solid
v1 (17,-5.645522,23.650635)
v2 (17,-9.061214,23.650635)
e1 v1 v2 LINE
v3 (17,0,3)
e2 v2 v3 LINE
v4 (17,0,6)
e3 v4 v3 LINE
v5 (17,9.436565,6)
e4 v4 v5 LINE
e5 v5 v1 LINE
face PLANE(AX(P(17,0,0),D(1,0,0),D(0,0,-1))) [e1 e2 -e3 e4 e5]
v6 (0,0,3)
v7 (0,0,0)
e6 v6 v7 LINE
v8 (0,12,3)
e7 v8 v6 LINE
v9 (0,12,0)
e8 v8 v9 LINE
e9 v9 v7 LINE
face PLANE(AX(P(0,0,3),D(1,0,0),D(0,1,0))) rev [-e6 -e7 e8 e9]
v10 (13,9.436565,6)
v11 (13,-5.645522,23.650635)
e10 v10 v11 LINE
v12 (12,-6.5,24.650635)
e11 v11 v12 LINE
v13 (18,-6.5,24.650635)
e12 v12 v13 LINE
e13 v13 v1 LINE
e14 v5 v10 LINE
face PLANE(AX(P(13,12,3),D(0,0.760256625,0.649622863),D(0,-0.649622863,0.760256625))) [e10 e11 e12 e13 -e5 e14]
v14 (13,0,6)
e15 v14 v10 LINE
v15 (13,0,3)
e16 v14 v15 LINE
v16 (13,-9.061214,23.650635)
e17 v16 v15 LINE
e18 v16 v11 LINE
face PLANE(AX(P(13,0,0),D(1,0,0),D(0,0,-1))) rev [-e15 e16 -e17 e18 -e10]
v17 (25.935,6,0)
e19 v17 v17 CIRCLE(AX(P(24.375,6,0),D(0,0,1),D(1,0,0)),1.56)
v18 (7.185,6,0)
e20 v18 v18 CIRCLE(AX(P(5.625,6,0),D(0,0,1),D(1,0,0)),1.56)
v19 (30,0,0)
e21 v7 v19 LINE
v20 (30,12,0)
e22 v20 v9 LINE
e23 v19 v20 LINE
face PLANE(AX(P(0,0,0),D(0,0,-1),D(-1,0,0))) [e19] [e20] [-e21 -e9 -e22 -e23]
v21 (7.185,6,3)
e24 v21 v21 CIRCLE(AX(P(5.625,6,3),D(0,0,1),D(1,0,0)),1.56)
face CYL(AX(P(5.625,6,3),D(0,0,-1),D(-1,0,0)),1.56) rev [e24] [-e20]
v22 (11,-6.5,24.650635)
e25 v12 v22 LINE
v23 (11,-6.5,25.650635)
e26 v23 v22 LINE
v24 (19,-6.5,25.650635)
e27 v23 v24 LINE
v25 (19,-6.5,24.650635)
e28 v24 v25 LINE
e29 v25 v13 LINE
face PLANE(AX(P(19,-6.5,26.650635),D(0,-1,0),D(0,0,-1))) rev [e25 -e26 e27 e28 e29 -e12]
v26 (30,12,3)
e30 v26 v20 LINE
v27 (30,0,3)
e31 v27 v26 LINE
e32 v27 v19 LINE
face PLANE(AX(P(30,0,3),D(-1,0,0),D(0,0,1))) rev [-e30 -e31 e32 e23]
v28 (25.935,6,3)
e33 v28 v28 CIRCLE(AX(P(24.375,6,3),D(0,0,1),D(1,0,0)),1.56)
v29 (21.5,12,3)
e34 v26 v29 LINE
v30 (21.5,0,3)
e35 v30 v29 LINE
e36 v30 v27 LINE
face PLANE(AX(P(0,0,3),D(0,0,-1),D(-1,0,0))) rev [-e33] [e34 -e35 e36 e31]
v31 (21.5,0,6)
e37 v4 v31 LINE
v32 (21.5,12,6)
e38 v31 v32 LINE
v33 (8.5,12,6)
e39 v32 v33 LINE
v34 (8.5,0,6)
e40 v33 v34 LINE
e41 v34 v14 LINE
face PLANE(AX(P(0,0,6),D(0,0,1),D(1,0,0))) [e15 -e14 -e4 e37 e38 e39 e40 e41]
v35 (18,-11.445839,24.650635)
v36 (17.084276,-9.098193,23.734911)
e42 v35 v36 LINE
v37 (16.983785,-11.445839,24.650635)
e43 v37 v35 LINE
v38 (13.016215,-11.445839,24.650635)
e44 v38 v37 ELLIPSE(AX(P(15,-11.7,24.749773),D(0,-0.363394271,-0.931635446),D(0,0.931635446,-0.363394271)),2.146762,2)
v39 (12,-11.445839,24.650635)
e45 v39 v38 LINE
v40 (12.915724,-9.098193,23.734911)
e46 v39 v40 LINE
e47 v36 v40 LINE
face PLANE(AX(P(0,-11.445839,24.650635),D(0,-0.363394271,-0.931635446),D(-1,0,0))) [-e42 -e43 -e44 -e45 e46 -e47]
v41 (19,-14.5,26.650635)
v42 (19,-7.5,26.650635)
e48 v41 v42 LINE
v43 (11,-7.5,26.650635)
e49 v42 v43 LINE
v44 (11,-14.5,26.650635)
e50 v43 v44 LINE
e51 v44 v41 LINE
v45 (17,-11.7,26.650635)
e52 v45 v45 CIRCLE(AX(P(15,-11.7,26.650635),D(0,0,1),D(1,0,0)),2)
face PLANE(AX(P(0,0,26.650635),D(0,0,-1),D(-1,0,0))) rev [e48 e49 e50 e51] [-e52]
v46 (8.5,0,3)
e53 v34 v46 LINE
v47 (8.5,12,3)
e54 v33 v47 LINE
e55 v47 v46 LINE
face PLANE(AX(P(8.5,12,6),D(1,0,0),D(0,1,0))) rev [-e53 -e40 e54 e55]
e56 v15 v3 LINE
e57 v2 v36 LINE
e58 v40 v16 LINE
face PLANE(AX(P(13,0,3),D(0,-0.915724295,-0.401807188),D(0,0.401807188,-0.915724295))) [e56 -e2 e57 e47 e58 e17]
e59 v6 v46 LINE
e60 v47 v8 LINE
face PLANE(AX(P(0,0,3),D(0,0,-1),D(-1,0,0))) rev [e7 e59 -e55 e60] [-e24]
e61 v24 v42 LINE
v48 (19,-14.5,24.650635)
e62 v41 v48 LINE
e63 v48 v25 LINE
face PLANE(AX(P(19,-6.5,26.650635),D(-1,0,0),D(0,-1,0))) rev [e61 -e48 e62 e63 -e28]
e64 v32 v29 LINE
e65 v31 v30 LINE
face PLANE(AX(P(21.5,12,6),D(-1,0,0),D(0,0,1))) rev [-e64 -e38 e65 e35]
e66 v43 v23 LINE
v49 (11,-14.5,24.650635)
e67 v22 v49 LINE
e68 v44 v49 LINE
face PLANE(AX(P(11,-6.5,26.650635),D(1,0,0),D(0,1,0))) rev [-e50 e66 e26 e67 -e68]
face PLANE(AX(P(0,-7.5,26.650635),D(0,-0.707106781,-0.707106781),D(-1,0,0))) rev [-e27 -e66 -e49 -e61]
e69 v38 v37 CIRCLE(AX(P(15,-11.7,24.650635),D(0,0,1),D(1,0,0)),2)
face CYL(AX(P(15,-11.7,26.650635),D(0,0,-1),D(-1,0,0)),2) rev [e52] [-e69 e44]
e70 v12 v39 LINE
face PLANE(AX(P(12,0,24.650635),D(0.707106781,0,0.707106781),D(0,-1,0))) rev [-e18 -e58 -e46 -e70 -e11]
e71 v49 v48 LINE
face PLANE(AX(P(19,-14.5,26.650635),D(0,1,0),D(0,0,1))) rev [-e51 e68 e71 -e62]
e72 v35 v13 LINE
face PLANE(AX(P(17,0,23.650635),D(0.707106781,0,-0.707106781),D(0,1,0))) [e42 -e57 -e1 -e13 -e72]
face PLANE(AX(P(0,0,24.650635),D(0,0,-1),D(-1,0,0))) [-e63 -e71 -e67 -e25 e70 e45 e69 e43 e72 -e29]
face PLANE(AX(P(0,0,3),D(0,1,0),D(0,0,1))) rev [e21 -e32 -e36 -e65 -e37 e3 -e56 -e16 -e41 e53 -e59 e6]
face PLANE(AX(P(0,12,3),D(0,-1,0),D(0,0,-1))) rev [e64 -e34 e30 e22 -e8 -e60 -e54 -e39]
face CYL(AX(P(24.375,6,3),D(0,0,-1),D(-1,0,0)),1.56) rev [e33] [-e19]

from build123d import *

# Parameters (mm, degrees)
SKETCH_1_W           = 30
SKETCH_1_H           = 12
SKETCH_1_R           = 1.56
EXTRUDE_1_DEPTH      = 3
SKETCH_2_W           = 13
SKETCH_2_H           = 12
EXTRUDE_2_DEPTH      = 3
EXTRUDE_3_DEPTH      = 2
EXTRUDE_3_DEPTH_BACK = 2
SKETCH_8_W           = 8
SKETCH_8_H           = 8
SKETCH_8_R           = 2
EXTRUDE_4_DEPTH      = 2
CHAMFER_3_SIZE       = 1.945839098
CHAMFER_3_SIZE_2     = 1
CHAMFER_6_SIZE       = 1


with BuildPart() as part:
    # 草图1 → 凸台-拉伸1 (new body)
    with BuildSketch(Plane.XY):
        with Locations((15, 6)):
            Rectangle(SKETCH_1_W, SKETCH_1_H)
        with Locations((5.625, 6)):
            Circle(SKETCH_1_R, mode=Mode.SUBTRACT)
        with Locations((24.375, 6)):
            Circle(SKETCH_1_R, mode=Mode.SUBTRACT)
    extrude(amount=EXTRUDE_1_DEPTH)

    # 草图2 → 凸台-拉伸2 (add)
    with BuildSketch(Plane.XY.offset(3)):
        with Locations((15, 6)):
            Rectangle(SKETCH_2_W, SKETCH_2_H)
    extrude(amount=EXTRUDE_2_DEPTH)

    # 草图4 → 凸台-拉伸3 (add, two sides: drawn at the far end of the back side and taken through both)
    with BuildSketch(Plane(origin=(15, 0, 0), x_dir=(0, 0, -1), z_dir=(1, 0, 0)).offset(-EXTRUDE_3_DEPTH_BACK)):
        Polygon((-3, 0), (-24.650635095, -9.5), (-24.650635095, -6.5), (-3, 12), (-3, 6), align=None)
    extrude(amount=EXTRUDE_3_DEPTH + EXTRUDE_3_DEPTH_BACK)

    # 草图8 → 凸台-拉伸4 (add)
    with BuildSketch(Plane.XY.offset(24.650635095)):
        with Locations((15, -10.5)):
            Rectangle(SKETCH_8_W, SKETCH_8_H)
        with Locations((15, -11.7)):
            Circle(SKETCH_8_R, mode=Mode.SUBTRACT)
    extrude(amount=EXTRUDE_4_DEPTH)

    # 倒角3
    # the kernel refuses this chamfer: 1.945839098, 1 mm, written as the material it adds along each edge
    with BuildSketch(Plane(origin=(17, -9.5, 24.650635095), x_dir=(0, -0.9999018246669207, 0.014012174269630025), z_dir=(-1, 0, 0))) as chamfer_3_piece_1_section:
        Polygon((CHAMFER_3_SIZE * 0.999901824771, -CHAMFER_3_SIZE * 0.0140121742711), (-CHAMFER_3_SIZE_2 * 0.414599028562, -CHAMFER_3_SIZE_2 * 0.910004200823), (0, 0), align=None)
    chamfer_3_piece_1 = extrude(amount=4, mode=Mode.PRIVATE)
    chamfer_3_piece_1 = chamfer_3_piece_1 - Plane(origin=(15, -11.7, 24.270363883), x_dir=(1, 0, 0), z_dir=(0, 0, -1)) * Cylinder(2, 16, mode=Mode.PRIVATE)
    add(chamfer_3_piece_1)
    # the kernel refuses this chamfer: 1.945839098, 1 mm, written as the material it adds along each edge
    with BuildSketch(Plane(origin=(17, -14.017522086, 24.650635095), x_dir=(-0.027495876610585647, 0, -0.9996219169112968), z_dir=(0, 1, 0))) as chamfer_3_2_piece_1_section:
        Polygon((CHAMFER_3_SIZE_2 * 0.999621916911, -CHAMFER_3_SIZE_2 * 0.0274958766106), (-CHAMFER_3_SIZE_2 * 0.0274958766106, -CHAMFER_3_SIZE_2 * 0.999621916911), (0, 0), align=None)
    chamfer_3_2_piece_1 = extrude(amount=7.517522086, mode=Mode.PRIVATE)
    chamfer_3_2_piece_1 = split(chamfer_3_2_piece_1, bisect_by=Plane(origin=(17.387306177, -10.236604408, 24.178960298), z_dir=(0, 0.3633942713145685, 0.9316354456415631)), keep=Keep.TOP, mode=Mode.PRIVATE)
    chamfer_3_2_piece_1 = split(chamfer_3_2_piece_1, bisect_by=Plane(origin=(17.387306177, -9.521448323, 24.699516127), z_dir=(0, -0.9157242946977782, -0.4018071877160198)), keep=Keep.TOP, mode=Mode.PRIVATE)
    add(chamfer_3_2_piece_1)
    with BuildSketch(Plane(origin=(17, -14.017522086, 24.650635095), x_dir=(-0.027495876610585647, 0, -0.9996219169112968), z_dir=(0, 1, 0))) as chamfer_3_2_piece_2_section:
        Polygon((CHAMFER_3_SIZE_2 * 0.999621916911, -CHAMFER_3_SIZE_2 * 0.0274958766106), (-CHAMFER_3_SIZE_2 * 0.0274958766106, -CHAMFER_3_SIZE_2 * 0.999621916911), (0, 0), align=None)
    chamfer_3_2_piece_2 = extrude(amount=7.517522086, mode=Mode.PRIVATE)
    chamfer_3_2_piece_2 = split(chamfer_3_2_piece_2, bisect_by=Plane(origin=(16.988383788, -8.994550798, 23.694484135), z_dir=(0, -0.3633942713145685, -0.9316354456415631)), keep=Keep.TOP, mode=Mode.PRIVATE)
    chamfer_3_2_piece_2 = split(chamfer_3_2_piece_2, bisect_by=Plane(origin=(16.988383788, -9.059659256, 23.647092278), z_dir=(0, 0.9157242946977782, 0.4018071877160198)), keep=Keep.TOP, mode=Mode.PRIVATE)
    add(chamfer_3_2_piece_2)
    with BuildSketch(Plane(origin=(17, -14.017522086, 24.650635095), x_dir=(-0.027495876610585647, 0, -0.9996219169112968), z_dir=(0, 1, 0))) as chamfer_3_2_piece_3_section:
        Polygon((CHAMFER_3_SIZE_2 * 0.999621916911, -CHAMFER_3_SIZE_2 * 0.0274958766106), (-CHAMFER_3_SIZE_2 * 0.0274958766106, -CHAMFER_3_SIZE_2 * 0.999621916911), (0, 0), align=None)
    chamfer_3_2_piece_3 = extrude(amount=7.517522086, mode=Mode.PRIVATE)
    chamfer_3_2_piece_3 = split(chamfer_3_2_piece_3, bisect_by=Plane(origin=(17.33510096, -8.285636608, 23.417964648), z_dir=(0, 0.3633942713145685, 0.9316354456415631)), keep=Keep.TOP, mode=Mode.PRIVATE)
    chamfer_3_2_piece_3 = split(chamfer_3_2_piece_3, bisect_by=Plane(origin=(17.33510096, -9.12878782, 23.804637257), z_dir=(0, 0.9157242946977782, 0.4018071877160198)), keep=Keep.TOP, mode=Mode.PRIVATE)
    chamfer_3_2_piece_3 = split(chamfer_3_2_piece_3, bisect_by=Plane(origin=(17.33510096, -6.945348717, 25.171828747), z_dir=(0, -0.7602566248543531, -0.649622863179143)), keep=Keep.TOP, mode=Mode.PRIVATE)
    add(chamfer_3_2_piece_3)
    with BuildSketch(Plane(origin=(17, -14.017522086, 24.650635095), x_dir=(-0.027495876610585647, 0, -0.9996219169112968), z_dir=(0, 1, 0))) as chamfer_3_2_piece_4_section:
        Polygon((CHAMFER_3_SIZE_2 * 0.999621916911, -CHAMFER_3_SIZE_2 * 0.0274958766106), (-CHAMFER_3_SIZE_2 * 0.0274958766106, -CHAMFER_3_SIZE_2 * 0.999621916911), (0, 0), align=None)
    chamfer_3_2_piece_4 = extrude(amount=10.089205074, mode=Mode.PRIVATE)
    chamfer_3_2_piece_4 = split(chamfer_3_2_piece_4, bisect_by=Plane(origin=(17.227791028, -6.5, 24.129350329), z_dir=(0, 1, 0)), keep=Keep.TOP, mode=Mode.PRIVATE)
    chamfer_3_2_piece_4 = split(chamfer_3_2_piece_4, bisect_by=Plane(origin=(17.227791028, -6.148560632, 24.239343986), z_dir=(0, -0.7602566248543531, -0.649622863179143)), keep=Keep.TOP, mode=Mode.PRIVATE)
    add(chamfer_3_2_piece_4)
    with BuildSketch(Plane(origin=(13, -3.928317012, 24.650635095), x_dir=(0.027495876610585647, 0, -0.9996219169112968), z_dir=(0, -1, 0))) as chamfer_3_2_piece_5_section:
        Polygon((CHAMFER_3_SIZE_2 * 0.999621916911, -CHAMFER_3_SIZE_2 * 0.0274958766106), (-CHAMFER_3_SIZE_2 * 0.0274958766106, -CHAMFER_3_SIZE_2 * 0.999621916911), (0, 0), align=None)
    chamfer_3_2_piece_5 = extrude(amount=10.089205074, mode=Mode.PRIVATE)
    chamfer_3_2_piece_5 = split(chamfer_3_2_piece_5, bisect_by=Plane(origin=(12.772208972, -6.5, 24.129350329), z_dir=(0, 1, 0)), keep=Keep.TOP, mode=Mode.PRIVATE)
    chamfer_3_2_piece_5 = split(chamfer_3_2_piece_5, bisect_by=Plane(origin=(12.772208972, -6.148560632, 24.239343986), z_dir=(0, -0.7602566248543531, -0.649622863179143)), keep=Keep.TOP, mode=Mode.PRIVATE)
    add(chamfer_3_2_piece_5)
    with BuildSketch(Plane(origin=(13, -6.5, 24.650635095), x_dir=(0.027495876610585647, 0, -0.9996219169112968), z_dir=(0, -1, 0))) as chamfer_3_2_piece_6_section:
        Polygon((CHAMFER_3_SIZE_2 * 0.999621916911, -CHAMFER_3_SIZE_2 * 0.0274958766106), (-CHAMFER_3_SIZE_2 * 0.0274958766106, -CHAMFER_3_SIZE_2 * 0.999621916911), (0, 0), align=None)
    chamfer_3_2_piece_6 = extrude(amount=7.517522086, mode=Mode.PRIVATE)
    chamfer_3_2_piece_6 = split(chamfer_3_2_piece_6, bisect_by=Plane(origin=(12.66489904, -8.285636608, 23.417964648), z_dir=(0, 0.3633942713145685, 0.9316354456415631)), keep=Keep.TOP, mode=Mode.PRIVATE)
    chamfer_3_2_piece_6 = split(chamfer_3_2_piece_6, bisect_by=Plane(origin=(12.66489904, -9.12878782, 23.804637257), z_dir=(0, 0.9157242946977782, 0.4018071877160198)), keep=Keep.TOP, mode=Mode.PRIVATE)
    chamfer_3_2_piece_6 = split(chamfer_3_2_piece_6, bisect_by=Plane(origin=(12.66489904, -6.945348717, 25.171828747), z_dir=(0, -0.7602566248543531, -0.649622863179143)), keep=Keep.TOP, mode=Mode.PRIVATE)
    add(chamfer_3_2_piece_6)
    with BuildSketch(Plane(origin=(13, -6.5, 24.650635095), x_dir=(0.027495876610585647, 0, -0.9996219169112968), z_dir=(0, -1, 0))) as chamfer_3_2_piece_7_section:
        Polygon((CHAMFER_3_SIZE_2 * 0.999621916911, -CHAMFER_3_SIZE_2 * 0.0274958766106), (-CHAMFER_3_SIZE_2 * 0.0274958766106, -CHAMFER_3_SIZE_2 * 0.999621916911), (0, 0), align=None)
    chamfer_3_2_piece_7 = extrude(amount=7.517522086, mode=Mode.PRIVATE)
    chamfer_3_2_piece_7 = split(chamfer_3_2_piece_7, bisect_by=Plane(origin=(12.612693823, -10.236604408, 24.178960298), z_dir=(0, 0.3633942713145685, 0.9316354456415631)), keep=Keep.TOP, mode=Mode.PRIVATE)
    chamfer_3_2_piece_7 = split(chamfer_3_2_piece_7, bisect_by=Plane(origin=(12.612693823, -9.521448323, 24.699516127), z_dir=(0, -0.9157242946977782, -0.4018071877160198)), keep=Keep.TOP, mode=Mode.PRIVATE)
    add(chamfer_3_2_piece_7)
    with BuildSketch(Plane(origin=(13, -6.5, 24.650635095), x_dir=(0.027495876610585647, 0, -0.9996219169112968), z_dir=(0, -1, 0))) as chamfer_3_2_piece_8_section:
        Polygon((CHAMFER_3_SIZE_2 * 0.999621916911, -CHAMFER_3_SIZE_2 * 0.0274958766106), (-CHAMFER_3_SIZE_2 * 0.0274958766106, -CHAMFER_3_SIZE_2 * 0.999621916911), (0, 0), align=None)
    chamfer_3_2_piece_8 = extrude(amount=7.517522086, mode=Mode.PRIVATE)
    chamfer_3_2_piece_8 = split(chamfer_3_2_piece_8, bisect_by=Plane(origin=(13.011616212, -8.994550798, 23.694484135), z_dir=(0, -0.3633942713145685, -0.9316354456415631)), keep=Keep.TOP, mode=Mode.PRIVATE)
    chamfer_3_2_piece_8 = split(chamfer_3_2_piece_8, bisect_by=Plane(origin=(13.011616212, -9.059659256, 23.647092278), z_dir=(0, 0.9157242946977782, 0.4018071877160198)), keep=Keep.TOP, mode=Mode.PRIVATE)
    add(chamfer_3_2_piece_8)

    # 倒角6
    chamfer_6_edges = [part.edges().sort_by_distance(p)[0] for p in [
        (15, -6.5, 26.650635095),
    ]]
    chamfer(chamfer_6_edges, length=CHAMFER_6_SIZE)


solid = part.part
